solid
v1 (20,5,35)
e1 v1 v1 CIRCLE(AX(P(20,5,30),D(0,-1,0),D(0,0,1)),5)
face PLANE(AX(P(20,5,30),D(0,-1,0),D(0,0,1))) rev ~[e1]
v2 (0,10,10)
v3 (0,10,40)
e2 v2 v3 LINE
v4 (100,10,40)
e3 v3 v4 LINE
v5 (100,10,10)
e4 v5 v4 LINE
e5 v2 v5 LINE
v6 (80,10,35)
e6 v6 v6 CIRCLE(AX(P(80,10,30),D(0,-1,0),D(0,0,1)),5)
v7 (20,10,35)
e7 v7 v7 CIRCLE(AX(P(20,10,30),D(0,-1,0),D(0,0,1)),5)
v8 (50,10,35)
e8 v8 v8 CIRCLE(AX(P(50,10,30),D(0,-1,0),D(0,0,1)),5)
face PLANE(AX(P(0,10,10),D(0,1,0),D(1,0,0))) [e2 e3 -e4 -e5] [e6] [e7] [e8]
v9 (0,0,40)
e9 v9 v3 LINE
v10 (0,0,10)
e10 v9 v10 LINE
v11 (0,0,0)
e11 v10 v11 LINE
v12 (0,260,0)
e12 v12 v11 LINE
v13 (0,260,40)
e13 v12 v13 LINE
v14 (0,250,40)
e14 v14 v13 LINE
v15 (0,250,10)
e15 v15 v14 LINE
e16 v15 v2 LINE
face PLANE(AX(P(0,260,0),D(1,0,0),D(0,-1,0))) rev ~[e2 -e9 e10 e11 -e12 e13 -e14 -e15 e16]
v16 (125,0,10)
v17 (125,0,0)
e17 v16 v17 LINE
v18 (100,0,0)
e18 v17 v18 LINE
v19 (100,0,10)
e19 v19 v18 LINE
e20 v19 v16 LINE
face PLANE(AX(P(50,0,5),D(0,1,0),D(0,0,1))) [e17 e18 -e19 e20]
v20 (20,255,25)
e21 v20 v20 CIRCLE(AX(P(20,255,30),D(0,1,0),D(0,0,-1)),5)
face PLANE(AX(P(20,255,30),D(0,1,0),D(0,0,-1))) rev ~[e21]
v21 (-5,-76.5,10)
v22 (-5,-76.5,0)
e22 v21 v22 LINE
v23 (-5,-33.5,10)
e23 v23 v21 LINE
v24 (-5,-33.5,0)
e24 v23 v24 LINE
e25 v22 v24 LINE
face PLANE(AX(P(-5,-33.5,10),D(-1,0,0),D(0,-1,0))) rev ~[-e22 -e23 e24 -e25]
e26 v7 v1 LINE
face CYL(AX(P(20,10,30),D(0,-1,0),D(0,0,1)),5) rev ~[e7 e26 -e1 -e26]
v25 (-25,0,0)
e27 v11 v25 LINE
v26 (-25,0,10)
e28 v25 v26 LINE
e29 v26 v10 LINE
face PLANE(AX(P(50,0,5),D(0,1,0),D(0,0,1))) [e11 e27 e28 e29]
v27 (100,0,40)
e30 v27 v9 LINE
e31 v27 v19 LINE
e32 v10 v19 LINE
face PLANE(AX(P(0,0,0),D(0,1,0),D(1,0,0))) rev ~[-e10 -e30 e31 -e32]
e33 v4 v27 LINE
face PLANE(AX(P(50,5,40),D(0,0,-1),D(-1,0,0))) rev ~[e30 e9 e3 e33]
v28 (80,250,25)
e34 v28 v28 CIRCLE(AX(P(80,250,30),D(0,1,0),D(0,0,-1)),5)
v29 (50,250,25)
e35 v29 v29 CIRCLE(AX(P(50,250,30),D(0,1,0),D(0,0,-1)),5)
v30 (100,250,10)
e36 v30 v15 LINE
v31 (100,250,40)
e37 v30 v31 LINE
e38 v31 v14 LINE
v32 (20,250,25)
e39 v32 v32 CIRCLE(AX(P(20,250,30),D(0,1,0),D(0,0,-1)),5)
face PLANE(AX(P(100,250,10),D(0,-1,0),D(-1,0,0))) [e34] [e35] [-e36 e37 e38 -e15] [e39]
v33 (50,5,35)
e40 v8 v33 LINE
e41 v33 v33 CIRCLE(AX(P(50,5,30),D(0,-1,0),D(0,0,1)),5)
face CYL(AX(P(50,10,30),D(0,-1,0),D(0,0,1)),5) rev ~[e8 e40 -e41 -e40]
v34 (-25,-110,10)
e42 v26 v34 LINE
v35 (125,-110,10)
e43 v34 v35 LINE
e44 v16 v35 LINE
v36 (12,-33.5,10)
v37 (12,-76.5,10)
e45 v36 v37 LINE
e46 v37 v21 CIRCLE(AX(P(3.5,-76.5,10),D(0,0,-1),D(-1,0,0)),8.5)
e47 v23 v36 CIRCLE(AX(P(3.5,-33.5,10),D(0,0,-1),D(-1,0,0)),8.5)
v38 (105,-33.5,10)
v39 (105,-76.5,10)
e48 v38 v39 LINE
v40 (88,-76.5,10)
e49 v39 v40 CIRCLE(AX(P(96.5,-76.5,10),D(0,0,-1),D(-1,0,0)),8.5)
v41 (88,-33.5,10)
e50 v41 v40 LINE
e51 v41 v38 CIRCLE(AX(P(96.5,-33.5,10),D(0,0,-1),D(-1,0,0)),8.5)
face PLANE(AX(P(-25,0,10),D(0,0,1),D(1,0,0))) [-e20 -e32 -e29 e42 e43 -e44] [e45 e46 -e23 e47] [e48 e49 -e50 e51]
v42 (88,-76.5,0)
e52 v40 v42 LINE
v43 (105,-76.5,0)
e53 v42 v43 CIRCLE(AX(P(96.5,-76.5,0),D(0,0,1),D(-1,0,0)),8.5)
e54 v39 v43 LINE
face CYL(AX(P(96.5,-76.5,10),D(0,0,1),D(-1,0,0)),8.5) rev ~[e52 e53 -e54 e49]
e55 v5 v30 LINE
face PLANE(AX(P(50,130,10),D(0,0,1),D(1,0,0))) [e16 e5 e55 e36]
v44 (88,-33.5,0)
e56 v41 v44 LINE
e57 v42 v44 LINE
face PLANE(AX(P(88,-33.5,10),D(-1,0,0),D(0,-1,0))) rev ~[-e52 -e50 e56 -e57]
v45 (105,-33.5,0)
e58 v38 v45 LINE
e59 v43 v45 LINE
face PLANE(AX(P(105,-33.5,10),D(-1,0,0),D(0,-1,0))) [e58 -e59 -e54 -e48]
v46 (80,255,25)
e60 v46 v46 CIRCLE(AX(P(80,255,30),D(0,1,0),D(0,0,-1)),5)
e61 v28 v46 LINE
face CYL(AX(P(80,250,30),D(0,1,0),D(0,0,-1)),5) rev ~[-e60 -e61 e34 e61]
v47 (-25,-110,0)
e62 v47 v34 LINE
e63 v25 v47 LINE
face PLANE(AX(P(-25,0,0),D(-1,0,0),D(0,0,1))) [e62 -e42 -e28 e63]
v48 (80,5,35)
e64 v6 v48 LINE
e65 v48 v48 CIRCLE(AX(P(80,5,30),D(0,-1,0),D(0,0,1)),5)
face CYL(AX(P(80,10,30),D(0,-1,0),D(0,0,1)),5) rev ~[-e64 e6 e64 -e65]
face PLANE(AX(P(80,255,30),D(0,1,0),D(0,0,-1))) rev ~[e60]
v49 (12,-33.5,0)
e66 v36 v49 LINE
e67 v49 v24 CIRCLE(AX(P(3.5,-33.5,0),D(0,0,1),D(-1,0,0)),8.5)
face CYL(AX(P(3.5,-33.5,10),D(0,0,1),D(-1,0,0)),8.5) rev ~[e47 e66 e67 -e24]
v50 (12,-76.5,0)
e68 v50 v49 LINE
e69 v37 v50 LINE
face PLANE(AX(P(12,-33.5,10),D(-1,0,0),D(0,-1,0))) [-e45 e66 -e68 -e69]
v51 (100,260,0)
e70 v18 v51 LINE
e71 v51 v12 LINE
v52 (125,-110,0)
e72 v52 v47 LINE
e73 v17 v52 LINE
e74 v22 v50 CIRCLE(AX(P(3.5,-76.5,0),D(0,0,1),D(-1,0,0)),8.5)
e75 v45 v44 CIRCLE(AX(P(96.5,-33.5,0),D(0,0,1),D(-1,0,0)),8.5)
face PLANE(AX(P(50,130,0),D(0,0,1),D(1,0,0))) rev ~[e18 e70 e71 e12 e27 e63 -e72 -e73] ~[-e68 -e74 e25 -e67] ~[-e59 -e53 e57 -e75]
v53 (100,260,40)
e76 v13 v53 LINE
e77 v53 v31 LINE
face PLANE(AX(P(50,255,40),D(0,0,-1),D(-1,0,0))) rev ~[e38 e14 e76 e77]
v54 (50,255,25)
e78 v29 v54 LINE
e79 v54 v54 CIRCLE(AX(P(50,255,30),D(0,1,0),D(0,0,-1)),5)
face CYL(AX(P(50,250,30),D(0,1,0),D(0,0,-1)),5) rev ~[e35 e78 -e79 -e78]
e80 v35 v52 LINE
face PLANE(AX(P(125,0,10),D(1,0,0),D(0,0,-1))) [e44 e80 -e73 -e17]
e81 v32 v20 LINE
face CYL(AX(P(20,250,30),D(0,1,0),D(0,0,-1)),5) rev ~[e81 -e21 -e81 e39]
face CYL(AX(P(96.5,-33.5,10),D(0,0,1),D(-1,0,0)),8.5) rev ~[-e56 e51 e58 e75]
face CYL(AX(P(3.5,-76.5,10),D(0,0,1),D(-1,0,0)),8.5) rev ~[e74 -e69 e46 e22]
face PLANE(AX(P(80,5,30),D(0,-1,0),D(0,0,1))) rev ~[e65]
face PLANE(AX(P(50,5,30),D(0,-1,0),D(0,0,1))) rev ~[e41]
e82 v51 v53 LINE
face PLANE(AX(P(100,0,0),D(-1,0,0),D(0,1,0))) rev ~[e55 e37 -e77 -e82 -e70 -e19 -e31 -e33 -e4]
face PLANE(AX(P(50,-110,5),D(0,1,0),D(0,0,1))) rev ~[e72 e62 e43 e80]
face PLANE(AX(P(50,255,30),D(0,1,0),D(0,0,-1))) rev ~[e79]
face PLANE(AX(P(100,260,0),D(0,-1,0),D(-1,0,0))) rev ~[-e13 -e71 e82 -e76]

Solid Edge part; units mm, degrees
sketch "Sketch1" plane through (0, 0, 0) normal (0, 0, 1) x (1, 0, 0)
  line L0 (100, 0) -> (100, 260)
  line L1 (100, 260) -> (0, 260)
  line L2 (0, 260) -> (0, 0)
  line L3 (0, 0) -> (100, 0)
extrude "Protrusion1" add sketch "Sketch1" along normal blind 10
sketch "Sketch2" plane through (50, 130, 10) normal (0, 0, 1) x (1, 0, 0)
  line L0 (-50, 130) -> (50, 130)
  line L1 (50, 130) -> (50, 120)
  line L2 (50, 120) -> (-50, 120)
  line L3 (-50, 120) -> (-50, 130)
  line L4 (-50, -120) -> (50, -120)
  line L5 (50, -120) -> (50, -130)
  line L6 (50, -130) -> (-50, -130)
  line L7 (-50, -130) -> (-50, -120)
  dimension "D1" = 10
  dimension "D2" = 10
extrude "ExtrudedCutout_1" add sketch "Sketch2" along normal blind 30
hole "Hole_1" at (20, 250, 30) direction (0, 1, 0) diameter 10 depth 5
hole "Hole1" at (50, 250, 30) direction (0, 1, 0) diameter 10 depth 5
hole "Hole2" at (80, 250, 30) direction (0, 1, 0) diameter 10 depth 5
hole "Hole_4" at (80, 10, 30) direction (0, -1, 0) diameter 10 depth 5
hole "Hole3" at (50, 10, 30) direction (0, -1, 0) diameter 10 depth 5
hole "Hole4" at (20, 10, 30) direction (0, -1, 0) diameter 10 depth 5
sketch "Sketch3" plane through (50, 0, 15) normal (0, -1, 0) x (0, 0, 1)
  line L0 (-5, -75) -> (-15, -75)
  line L1 (-15, -75) -> (-15, 75)
  line L2 (-15, 75) -> (-5, 75)
  line L3 (-5, 75) -> (-5, -75)
extrude "ExtrudedProtrusion_5" add sketch "Sketch3" along normal blind 110
sketch "Sketch4" plane through (50, -55, 10) normal (0, 0, 1) x (-1, 0, 0)
  arc A0 (-55, 21.5) -> (-38, 21.5) centre (-46.5, 21.5) cw
  line L0 (-55, -21.5) -> (-55, 21.5)
  arc A1 (-38, -21.5) -> (-55, -21.5) centre (-46.5, -21.5) cw
  line L1 (-38, -21.5) -> (-38, 21.5)
  arc A2 (38, 21.5) -> (55, 21.5) centre (46.5, 21.5) cw
  line L2 (38, -21.5) -> (38, 21.5)
  arc A3 (55, -21.5) -> (38, -21.5) centre (46.5, -21.5) cw
  line L3 (55, -21.5) -> (55, 21.5)
  dimension "D1" = 17
  dimension "D2" = 17
  dimension "D3" = 110
  dimension "D4" = 60
  dimension "D5" = 25
  dimension "D6" = 25
  dimension "D7" = 20
  dimension "D8" = 20
extrude "Cutout1" cut sketch "Sketch4" against normal up to next
